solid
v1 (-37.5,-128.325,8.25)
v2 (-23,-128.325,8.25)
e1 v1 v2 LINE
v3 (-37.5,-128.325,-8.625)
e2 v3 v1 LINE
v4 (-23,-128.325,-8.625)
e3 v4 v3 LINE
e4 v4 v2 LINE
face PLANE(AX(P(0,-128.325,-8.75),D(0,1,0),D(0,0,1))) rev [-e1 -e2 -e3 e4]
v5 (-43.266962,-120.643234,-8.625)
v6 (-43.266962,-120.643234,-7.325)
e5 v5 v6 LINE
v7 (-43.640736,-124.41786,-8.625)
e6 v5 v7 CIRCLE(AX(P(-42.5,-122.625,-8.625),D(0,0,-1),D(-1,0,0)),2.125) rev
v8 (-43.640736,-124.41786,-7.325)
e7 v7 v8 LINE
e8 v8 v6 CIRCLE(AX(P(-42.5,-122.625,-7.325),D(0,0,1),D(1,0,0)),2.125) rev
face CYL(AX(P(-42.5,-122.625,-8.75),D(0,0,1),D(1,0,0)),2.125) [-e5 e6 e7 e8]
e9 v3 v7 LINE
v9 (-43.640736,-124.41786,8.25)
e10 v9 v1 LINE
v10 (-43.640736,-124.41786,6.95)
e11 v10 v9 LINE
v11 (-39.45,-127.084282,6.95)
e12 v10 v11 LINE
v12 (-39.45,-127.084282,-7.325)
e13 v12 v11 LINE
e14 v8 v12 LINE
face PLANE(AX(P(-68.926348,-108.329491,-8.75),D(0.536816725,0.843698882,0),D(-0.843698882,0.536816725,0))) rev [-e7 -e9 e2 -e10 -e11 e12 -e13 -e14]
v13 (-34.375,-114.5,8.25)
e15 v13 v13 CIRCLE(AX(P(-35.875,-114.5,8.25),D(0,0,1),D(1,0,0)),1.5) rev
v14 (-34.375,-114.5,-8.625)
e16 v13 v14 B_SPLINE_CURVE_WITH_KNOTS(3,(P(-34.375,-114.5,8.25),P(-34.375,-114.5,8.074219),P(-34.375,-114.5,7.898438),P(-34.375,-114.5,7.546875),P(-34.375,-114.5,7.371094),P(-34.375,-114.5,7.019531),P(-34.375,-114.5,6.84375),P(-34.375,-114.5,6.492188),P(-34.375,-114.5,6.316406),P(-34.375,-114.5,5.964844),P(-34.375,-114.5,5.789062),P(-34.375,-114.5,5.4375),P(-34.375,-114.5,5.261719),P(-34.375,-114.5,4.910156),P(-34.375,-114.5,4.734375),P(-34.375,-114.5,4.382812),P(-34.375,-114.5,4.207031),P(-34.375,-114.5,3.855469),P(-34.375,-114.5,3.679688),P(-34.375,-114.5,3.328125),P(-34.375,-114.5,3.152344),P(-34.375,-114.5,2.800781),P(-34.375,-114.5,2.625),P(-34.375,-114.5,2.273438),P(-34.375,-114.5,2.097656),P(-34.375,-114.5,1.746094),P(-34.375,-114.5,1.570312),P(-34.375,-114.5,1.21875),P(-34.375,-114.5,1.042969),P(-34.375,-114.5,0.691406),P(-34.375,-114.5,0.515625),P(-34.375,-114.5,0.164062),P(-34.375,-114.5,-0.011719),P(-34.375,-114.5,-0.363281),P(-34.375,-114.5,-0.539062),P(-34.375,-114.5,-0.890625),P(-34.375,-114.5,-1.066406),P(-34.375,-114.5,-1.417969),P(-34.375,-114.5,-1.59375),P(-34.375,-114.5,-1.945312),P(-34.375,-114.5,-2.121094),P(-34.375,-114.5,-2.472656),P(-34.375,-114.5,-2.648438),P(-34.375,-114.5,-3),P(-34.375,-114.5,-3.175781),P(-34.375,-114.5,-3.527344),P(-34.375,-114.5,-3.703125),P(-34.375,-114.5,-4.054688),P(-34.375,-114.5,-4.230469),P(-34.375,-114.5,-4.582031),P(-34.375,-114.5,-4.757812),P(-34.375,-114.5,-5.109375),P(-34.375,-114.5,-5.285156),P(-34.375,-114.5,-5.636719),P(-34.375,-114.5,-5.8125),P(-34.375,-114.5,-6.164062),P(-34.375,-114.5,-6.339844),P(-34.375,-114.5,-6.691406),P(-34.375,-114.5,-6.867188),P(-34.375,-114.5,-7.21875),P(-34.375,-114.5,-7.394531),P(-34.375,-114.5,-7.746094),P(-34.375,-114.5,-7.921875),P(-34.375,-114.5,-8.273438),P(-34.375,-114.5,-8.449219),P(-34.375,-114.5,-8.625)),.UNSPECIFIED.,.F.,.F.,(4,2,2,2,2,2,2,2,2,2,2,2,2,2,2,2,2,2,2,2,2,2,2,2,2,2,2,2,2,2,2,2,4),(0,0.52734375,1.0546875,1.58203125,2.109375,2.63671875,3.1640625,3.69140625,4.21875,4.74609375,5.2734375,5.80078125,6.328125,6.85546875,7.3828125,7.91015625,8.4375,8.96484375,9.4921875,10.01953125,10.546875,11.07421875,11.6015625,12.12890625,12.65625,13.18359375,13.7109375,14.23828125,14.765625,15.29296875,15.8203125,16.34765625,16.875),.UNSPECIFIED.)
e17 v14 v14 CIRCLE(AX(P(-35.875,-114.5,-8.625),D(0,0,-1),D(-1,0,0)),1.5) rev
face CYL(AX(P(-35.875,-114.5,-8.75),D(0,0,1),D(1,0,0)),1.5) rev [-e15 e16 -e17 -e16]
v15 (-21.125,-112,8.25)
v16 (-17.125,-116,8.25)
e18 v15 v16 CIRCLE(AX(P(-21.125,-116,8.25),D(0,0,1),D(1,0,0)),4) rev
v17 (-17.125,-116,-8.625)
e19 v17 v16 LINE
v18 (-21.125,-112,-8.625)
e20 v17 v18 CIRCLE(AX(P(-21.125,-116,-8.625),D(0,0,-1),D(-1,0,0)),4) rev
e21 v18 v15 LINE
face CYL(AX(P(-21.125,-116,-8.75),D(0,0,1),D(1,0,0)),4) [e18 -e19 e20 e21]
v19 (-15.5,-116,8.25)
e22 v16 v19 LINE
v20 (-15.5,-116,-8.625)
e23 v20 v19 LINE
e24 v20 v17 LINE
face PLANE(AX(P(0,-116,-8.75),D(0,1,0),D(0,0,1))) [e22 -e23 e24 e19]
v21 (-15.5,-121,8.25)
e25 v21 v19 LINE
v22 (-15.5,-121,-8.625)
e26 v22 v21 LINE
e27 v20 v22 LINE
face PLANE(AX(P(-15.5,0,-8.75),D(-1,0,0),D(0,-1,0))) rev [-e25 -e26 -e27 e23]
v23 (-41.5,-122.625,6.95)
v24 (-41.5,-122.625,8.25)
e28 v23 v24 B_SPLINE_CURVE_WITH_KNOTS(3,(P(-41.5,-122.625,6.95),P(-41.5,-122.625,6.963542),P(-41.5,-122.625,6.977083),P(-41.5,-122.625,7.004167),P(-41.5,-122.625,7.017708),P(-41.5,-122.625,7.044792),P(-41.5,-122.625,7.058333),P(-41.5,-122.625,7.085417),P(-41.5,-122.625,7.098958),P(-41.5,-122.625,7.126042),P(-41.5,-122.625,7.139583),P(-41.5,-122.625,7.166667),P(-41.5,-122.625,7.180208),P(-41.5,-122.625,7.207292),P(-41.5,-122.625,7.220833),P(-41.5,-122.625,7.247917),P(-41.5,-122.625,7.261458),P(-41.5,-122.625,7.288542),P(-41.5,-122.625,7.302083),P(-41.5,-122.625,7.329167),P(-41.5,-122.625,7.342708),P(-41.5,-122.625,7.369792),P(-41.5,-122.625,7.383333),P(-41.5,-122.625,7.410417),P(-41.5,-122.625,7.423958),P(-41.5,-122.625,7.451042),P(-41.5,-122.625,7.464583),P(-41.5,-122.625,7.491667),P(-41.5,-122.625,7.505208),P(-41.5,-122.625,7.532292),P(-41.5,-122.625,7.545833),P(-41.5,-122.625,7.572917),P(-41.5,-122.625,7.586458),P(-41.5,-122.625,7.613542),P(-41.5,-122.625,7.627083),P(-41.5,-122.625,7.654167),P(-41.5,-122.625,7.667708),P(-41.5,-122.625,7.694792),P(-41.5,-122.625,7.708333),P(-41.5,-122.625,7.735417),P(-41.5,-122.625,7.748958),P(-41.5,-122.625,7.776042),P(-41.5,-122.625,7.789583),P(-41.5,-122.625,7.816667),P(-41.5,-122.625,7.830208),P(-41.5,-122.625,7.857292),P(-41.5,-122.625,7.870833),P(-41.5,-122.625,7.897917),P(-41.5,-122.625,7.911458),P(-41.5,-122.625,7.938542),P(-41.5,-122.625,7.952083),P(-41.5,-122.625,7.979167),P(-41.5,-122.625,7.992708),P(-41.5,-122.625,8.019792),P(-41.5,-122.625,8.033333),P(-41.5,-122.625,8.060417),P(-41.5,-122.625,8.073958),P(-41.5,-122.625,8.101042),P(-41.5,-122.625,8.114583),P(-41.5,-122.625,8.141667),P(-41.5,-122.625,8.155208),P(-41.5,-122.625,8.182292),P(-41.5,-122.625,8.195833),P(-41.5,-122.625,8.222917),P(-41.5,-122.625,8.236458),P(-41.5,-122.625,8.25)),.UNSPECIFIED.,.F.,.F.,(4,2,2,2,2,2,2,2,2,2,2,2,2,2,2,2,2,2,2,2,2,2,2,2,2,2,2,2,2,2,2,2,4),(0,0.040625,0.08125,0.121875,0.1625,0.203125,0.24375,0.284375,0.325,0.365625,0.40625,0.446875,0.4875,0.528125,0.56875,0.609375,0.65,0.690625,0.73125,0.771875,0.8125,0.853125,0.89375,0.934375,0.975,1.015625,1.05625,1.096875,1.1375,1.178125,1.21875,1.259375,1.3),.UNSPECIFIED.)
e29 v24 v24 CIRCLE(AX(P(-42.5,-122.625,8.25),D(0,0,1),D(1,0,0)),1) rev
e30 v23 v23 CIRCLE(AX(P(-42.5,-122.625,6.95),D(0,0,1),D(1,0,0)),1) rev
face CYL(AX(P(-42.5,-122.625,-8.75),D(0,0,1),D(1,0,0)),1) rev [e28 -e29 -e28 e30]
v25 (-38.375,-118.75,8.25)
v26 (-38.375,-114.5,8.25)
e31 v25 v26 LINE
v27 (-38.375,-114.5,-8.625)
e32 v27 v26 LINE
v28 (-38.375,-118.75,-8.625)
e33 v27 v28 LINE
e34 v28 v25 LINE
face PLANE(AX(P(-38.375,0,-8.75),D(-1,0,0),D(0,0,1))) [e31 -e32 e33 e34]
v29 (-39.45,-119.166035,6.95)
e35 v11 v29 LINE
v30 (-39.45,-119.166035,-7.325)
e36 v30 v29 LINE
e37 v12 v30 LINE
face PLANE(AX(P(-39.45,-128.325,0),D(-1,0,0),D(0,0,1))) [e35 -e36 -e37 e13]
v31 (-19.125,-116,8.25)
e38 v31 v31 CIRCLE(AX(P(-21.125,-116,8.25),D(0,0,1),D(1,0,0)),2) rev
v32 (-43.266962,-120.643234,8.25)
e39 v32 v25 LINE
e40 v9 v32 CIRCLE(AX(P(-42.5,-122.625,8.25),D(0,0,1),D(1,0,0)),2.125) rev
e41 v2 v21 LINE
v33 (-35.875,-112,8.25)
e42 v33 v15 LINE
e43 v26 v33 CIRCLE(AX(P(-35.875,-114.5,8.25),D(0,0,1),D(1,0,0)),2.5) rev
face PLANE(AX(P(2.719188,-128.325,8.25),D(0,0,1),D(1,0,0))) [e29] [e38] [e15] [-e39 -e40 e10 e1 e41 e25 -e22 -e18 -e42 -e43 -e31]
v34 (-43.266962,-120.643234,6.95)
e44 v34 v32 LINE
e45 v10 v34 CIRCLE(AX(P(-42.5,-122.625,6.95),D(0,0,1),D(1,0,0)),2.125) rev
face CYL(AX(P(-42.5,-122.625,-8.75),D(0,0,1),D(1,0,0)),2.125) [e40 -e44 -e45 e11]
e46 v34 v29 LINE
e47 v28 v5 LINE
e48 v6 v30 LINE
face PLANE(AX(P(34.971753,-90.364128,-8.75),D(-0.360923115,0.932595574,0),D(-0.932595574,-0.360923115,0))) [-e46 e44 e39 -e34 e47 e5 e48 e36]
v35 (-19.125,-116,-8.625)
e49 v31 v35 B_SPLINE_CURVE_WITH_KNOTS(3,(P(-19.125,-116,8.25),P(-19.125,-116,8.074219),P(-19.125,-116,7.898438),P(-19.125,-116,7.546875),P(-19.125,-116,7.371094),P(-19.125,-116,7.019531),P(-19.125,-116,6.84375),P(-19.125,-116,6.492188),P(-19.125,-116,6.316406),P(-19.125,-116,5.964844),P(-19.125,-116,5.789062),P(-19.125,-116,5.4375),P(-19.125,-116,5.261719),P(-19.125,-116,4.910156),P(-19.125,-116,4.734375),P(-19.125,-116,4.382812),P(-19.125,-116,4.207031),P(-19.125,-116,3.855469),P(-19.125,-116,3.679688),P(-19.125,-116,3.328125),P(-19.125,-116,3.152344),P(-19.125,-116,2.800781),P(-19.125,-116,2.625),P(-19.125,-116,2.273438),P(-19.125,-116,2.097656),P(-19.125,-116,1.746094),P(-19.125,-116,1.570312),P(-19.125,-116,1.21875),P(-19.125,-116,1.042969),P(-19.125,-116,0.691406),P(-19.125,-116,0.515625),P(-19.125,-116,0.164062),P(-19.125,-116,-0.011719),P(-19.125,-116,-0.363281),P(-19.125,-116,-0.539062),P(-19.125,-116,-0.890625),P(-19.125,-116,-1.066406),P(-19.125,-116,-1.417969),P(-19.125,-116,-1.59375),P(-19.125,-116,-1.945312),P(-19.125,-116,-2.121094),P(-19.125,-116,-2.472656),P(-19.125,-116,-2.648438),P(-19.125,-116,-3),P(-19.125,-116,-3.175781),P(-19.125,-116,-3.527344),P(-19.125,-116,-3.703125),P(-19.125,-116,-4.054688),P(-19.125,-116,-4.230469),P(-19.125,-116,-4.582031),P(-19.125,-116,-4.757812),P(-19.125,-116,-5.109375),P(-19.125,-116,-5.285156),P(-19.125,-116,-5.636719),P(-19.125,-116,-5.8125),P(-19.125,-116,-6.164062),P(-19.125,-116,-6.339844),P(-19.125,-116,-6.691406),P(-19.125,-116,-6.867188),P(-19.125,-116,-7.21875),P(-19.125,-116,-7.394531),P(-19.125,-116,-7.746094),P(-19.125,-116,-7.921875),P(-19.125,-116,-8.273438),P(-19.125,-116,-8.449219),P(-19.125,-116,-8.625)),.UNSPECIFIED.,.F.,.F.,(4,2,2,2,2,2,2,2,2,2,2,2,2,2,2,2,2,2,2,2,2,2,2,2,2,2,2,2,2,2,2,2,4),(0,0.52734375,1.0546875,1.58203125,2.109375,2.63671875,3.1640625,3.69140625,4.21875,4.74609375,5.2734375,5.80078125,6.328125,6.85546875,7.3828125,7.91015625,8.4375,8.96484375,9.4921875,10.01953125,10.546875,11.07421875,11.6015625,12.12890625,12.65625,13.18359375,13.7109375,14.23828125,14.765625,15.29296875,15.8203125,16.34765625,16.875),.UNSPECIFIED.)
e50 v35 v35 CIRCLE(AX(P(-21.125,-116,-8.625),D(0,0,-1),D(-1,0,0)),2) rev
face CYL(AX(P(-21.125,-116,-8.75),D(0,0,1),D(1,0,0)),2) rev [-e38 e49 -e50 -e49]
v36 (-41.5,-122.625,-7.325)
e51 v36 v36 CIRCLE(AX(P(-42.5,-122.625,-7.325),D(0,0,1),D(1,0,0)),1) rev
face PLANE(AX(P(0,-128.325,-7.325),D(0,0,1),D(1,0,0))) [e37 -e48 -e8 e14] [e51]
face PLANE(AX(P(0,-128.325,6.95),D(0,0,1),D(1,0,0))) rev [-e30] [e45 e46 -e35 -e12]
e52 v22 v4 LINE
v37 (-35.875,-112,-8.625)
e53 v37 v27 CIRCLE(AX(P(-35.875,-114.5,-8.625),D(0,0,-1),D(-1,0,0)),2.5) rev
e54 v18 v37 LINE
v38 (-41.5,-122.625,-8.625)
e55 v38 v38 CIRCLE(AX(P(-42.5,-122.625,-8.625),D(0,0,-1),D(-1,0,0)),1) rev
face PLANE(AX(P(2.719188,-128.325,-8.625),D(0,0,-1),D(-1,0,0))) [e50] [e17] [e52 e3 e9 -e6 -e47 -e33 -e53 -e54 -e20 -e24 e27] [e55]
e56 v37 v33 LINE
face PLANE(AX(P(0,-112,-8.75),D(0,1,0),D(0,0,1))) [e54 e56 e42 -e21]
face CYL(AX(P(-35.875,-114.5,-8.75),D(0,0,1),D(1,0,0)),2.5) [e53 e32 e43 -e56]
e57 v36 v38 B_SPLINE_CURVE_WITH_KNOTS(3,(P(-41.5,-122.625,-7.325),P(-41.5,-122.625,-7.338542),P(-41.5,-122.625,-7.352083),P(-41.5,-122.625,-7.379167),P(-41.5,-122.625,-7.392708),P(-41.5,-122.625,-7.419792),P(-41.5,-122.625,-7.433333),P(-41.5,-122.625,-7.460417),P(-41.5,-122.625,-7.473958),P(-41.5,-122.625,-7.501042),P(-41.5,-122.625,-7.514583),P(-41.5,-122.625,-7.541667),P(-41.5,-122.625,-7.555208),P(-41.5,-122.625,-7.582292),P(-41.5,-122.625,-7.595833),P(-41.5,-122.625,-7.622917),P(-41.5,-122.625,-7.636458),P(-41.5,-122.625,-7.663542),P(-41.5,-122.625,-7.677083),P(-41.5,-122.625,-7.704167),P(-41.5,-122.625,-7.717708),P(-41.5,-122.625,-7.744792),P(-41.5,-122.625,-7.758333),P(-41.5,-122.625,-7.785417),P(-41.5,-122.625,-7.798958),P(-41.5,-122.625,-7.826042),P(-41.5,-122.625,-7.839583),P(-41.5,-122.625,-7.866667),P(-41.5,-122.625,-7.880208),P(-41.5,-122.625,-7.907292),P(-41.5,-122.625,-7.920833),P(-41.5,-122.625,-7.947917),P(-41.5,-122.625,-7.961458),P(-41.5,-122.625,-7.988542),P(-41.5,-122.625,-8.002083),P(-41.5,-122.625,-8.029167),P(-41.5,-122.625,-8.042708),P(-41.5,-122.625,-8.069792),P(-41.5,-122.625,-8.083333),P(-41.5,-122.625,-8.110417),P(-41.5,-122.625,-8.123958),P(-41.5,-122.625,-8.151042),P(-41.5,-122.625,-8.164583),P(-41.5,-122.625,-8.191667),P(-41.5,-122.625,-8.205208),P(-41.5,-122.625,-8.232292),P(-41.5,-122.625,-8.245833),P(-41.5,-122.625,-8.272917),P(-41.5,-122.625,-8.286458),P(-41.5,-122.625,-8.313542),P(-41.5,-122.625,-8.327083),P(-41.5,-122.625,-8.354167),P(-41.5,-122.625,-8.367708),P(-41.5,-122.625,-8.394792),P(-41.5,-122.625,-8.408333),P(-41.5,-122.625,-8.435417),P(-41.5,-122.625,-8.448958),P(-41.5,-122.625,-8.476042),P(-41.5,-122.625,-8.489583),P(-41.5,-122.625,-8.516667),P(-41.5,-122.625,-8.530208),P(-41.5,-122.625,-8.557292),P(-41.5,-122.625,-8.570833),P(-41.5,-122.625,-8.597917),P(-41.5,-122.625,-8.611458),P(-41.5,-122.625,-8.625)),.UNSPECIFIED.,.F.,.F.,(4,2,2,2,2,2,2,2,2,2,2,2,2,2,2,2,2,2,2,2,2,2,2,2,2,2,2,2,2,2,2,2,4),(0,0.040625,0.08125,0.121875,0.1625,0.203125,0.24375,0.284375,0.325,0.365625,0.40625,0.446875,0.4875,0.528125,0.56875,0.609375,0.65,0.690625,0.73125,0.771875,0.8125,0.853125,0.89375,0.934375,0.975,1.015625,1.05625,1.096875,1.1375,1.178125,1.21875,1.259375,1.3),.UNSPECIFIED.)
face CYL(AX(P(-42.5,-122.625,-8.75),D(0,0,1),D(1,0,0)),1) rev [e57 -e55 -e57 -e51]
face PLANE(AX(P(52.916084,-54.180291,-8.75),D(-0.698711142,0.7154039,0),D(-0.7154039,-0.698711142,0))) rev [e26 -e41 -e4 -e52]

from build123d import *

# Parameters (mm, degrees)
SKETCH_2_R               = 4
SKETCH_2_R_2             = 2
SKETCH_2_R_3             = 2.5
SKETCH_2_R_4             = 1.5
SKETCH_2_R_5             = 2.125
SKETCH_2_R_6             = 1
EXTRUDE_1_DEPTH          = 17.125
CUT_EXTRUDE_1_DEPTH      = 137.144257132
CUT_EXTRUDE_1_DEPTH_BACK = 137.144257132
SKETCH_3_W               = 6.985996156
SKETCH_3_H               = 14.275
CUT_EXTRUDE_START        = -128.325
CUT_EXTRUDE_2_OUTLINE_W  = 32
CUT_EXTRUDE_2_OUTLINE_H  = 0.125
CUT_EXTRUDE_2_DEPTH      = 16.325


# Read off the part's stored shape, not the designer's step: 切除-拉伸2
with BuildPart() as part:
    # 草图2 → 凸台-拉伸1 (new body)
    # profile 1 of 4: a face of its own
    with BuildSketch(Plane.XY.offset(8.375)):
        with BuildLine():
            Line((-15.5, -121), (-15.5, -116))
            Line((-15.5, -116), (-17.125, -116))
            ThreePointArc((-17.125, -116), (-23.953427125, -118.828427125), (-21.125, -112))
            Line((-21.125, -112), (-35.875, -112))
            ThreePointArc((-35.875, -112), (-34.107233047, -112.732233047), (-33.375, -114.5))
            ThreePointArc((-33.375, -114.5), (-35.875, -117), (-38.375, -114.5))
            Line((-38.375, -114.5), (-38.375, -118.75))
            Line((-38.375, -118.75), (-43.26696162, -120.643234405))
            ThreePointArc((-43.26696162, -120.643234405), (-41.298785706, -120.872085507), (-40.375, -122.625))
            ThreePointArc((-40.375, -122.625), (-41.477365663, -124.487751731), (-43.640735541, -124.417860124))
            Line((-43.640735541, -124.417860124), (-37.5, -128.325))
            Line((-37.5, -128.325), (-23, -128.325))
            Line((-23, -128.325), (-15.5, -121))
        make_face()
    # profile 2 of 4: a face of its own
    with BuildSketch(Plane.XY.offset(8.375)):
        with Locations((-21.125, -116)):
            Circle(SKETCH_2_R)
        with Locations((-21.125, -116)):
            Circle(SKETCH_2_R_2, mode=Mode.SUBTRACT)
    # profile 3 of 4: a face of its own
    with BuildSketch(Plane.XY.offset(8.375)):
        with Locations((-35.875, -114.5)):
            Circle(SKETCH_2_R_3)
        with Locations((-35.875, -114.5)):
            Circle(SKETCH_2_R_4, mode=Mode.SUBTRACT)
    # profile 4 of 4: a face of its own
    with BuildSketch(Plane.XY.offset(8.375)):
        with Locations((-42.5, -122.625)):
            Circle(SKETCH_2_R_5)
        with Locations((-42.5, -122.625)):
            Circle(SKETCH_2_R_6, mode=Mode.SUBTRACT)
    extrude(amount=-EXTRUDE_1_DEPTH)

    # 草图3 → 切除-拉伸1 (cut, two sides: drawn at the far end of the back side and taken through both)
    with BuildSketch(Plane(origin=(0, 0, 0), x_dir=(1, 0, 0), z_dir=(0, 1, 0)).offset(-CUT_EXTRUDE_1_DEPTH_BACK)):
        with Locations((-42.942998078, 0.1875)):
            Rectangle(SKETCH_3_W, SKETCH_3_H)
    extrude(amount=CUT_EXTRUDE_1_DEPTH + CUT_EXTRUDE_1_DEPTH_BACK, mode=Mode.SUBTRACT)

    # 切除-拉伸2 outline → 切除-拉伸2 (cut)
    with BuildSketch(Plane(origin=(0, 0, 0), x_dir=(1, 0, 0), z_dir=(0, 1, 0)).offset(CUT_EXTRUDE_START)):
        with Locations((-30, -8.3125)):
            Rectangle(CUT_EXTRUDE_2_OUTLINE_W, CUT_EXTRUDE_2_OUTLINE_H)
        with Locations((-30, 8.6875)):
            Rectangle(CUT_EXTRUDE_2_OUTLINE_W, CUT_EXTRUDE_2_OUTLINE_H)
    extrude(amount=CUT_EXTRUDE_2_DEPTH, mode=Mode.SUBTRACT)


solid = part.part
